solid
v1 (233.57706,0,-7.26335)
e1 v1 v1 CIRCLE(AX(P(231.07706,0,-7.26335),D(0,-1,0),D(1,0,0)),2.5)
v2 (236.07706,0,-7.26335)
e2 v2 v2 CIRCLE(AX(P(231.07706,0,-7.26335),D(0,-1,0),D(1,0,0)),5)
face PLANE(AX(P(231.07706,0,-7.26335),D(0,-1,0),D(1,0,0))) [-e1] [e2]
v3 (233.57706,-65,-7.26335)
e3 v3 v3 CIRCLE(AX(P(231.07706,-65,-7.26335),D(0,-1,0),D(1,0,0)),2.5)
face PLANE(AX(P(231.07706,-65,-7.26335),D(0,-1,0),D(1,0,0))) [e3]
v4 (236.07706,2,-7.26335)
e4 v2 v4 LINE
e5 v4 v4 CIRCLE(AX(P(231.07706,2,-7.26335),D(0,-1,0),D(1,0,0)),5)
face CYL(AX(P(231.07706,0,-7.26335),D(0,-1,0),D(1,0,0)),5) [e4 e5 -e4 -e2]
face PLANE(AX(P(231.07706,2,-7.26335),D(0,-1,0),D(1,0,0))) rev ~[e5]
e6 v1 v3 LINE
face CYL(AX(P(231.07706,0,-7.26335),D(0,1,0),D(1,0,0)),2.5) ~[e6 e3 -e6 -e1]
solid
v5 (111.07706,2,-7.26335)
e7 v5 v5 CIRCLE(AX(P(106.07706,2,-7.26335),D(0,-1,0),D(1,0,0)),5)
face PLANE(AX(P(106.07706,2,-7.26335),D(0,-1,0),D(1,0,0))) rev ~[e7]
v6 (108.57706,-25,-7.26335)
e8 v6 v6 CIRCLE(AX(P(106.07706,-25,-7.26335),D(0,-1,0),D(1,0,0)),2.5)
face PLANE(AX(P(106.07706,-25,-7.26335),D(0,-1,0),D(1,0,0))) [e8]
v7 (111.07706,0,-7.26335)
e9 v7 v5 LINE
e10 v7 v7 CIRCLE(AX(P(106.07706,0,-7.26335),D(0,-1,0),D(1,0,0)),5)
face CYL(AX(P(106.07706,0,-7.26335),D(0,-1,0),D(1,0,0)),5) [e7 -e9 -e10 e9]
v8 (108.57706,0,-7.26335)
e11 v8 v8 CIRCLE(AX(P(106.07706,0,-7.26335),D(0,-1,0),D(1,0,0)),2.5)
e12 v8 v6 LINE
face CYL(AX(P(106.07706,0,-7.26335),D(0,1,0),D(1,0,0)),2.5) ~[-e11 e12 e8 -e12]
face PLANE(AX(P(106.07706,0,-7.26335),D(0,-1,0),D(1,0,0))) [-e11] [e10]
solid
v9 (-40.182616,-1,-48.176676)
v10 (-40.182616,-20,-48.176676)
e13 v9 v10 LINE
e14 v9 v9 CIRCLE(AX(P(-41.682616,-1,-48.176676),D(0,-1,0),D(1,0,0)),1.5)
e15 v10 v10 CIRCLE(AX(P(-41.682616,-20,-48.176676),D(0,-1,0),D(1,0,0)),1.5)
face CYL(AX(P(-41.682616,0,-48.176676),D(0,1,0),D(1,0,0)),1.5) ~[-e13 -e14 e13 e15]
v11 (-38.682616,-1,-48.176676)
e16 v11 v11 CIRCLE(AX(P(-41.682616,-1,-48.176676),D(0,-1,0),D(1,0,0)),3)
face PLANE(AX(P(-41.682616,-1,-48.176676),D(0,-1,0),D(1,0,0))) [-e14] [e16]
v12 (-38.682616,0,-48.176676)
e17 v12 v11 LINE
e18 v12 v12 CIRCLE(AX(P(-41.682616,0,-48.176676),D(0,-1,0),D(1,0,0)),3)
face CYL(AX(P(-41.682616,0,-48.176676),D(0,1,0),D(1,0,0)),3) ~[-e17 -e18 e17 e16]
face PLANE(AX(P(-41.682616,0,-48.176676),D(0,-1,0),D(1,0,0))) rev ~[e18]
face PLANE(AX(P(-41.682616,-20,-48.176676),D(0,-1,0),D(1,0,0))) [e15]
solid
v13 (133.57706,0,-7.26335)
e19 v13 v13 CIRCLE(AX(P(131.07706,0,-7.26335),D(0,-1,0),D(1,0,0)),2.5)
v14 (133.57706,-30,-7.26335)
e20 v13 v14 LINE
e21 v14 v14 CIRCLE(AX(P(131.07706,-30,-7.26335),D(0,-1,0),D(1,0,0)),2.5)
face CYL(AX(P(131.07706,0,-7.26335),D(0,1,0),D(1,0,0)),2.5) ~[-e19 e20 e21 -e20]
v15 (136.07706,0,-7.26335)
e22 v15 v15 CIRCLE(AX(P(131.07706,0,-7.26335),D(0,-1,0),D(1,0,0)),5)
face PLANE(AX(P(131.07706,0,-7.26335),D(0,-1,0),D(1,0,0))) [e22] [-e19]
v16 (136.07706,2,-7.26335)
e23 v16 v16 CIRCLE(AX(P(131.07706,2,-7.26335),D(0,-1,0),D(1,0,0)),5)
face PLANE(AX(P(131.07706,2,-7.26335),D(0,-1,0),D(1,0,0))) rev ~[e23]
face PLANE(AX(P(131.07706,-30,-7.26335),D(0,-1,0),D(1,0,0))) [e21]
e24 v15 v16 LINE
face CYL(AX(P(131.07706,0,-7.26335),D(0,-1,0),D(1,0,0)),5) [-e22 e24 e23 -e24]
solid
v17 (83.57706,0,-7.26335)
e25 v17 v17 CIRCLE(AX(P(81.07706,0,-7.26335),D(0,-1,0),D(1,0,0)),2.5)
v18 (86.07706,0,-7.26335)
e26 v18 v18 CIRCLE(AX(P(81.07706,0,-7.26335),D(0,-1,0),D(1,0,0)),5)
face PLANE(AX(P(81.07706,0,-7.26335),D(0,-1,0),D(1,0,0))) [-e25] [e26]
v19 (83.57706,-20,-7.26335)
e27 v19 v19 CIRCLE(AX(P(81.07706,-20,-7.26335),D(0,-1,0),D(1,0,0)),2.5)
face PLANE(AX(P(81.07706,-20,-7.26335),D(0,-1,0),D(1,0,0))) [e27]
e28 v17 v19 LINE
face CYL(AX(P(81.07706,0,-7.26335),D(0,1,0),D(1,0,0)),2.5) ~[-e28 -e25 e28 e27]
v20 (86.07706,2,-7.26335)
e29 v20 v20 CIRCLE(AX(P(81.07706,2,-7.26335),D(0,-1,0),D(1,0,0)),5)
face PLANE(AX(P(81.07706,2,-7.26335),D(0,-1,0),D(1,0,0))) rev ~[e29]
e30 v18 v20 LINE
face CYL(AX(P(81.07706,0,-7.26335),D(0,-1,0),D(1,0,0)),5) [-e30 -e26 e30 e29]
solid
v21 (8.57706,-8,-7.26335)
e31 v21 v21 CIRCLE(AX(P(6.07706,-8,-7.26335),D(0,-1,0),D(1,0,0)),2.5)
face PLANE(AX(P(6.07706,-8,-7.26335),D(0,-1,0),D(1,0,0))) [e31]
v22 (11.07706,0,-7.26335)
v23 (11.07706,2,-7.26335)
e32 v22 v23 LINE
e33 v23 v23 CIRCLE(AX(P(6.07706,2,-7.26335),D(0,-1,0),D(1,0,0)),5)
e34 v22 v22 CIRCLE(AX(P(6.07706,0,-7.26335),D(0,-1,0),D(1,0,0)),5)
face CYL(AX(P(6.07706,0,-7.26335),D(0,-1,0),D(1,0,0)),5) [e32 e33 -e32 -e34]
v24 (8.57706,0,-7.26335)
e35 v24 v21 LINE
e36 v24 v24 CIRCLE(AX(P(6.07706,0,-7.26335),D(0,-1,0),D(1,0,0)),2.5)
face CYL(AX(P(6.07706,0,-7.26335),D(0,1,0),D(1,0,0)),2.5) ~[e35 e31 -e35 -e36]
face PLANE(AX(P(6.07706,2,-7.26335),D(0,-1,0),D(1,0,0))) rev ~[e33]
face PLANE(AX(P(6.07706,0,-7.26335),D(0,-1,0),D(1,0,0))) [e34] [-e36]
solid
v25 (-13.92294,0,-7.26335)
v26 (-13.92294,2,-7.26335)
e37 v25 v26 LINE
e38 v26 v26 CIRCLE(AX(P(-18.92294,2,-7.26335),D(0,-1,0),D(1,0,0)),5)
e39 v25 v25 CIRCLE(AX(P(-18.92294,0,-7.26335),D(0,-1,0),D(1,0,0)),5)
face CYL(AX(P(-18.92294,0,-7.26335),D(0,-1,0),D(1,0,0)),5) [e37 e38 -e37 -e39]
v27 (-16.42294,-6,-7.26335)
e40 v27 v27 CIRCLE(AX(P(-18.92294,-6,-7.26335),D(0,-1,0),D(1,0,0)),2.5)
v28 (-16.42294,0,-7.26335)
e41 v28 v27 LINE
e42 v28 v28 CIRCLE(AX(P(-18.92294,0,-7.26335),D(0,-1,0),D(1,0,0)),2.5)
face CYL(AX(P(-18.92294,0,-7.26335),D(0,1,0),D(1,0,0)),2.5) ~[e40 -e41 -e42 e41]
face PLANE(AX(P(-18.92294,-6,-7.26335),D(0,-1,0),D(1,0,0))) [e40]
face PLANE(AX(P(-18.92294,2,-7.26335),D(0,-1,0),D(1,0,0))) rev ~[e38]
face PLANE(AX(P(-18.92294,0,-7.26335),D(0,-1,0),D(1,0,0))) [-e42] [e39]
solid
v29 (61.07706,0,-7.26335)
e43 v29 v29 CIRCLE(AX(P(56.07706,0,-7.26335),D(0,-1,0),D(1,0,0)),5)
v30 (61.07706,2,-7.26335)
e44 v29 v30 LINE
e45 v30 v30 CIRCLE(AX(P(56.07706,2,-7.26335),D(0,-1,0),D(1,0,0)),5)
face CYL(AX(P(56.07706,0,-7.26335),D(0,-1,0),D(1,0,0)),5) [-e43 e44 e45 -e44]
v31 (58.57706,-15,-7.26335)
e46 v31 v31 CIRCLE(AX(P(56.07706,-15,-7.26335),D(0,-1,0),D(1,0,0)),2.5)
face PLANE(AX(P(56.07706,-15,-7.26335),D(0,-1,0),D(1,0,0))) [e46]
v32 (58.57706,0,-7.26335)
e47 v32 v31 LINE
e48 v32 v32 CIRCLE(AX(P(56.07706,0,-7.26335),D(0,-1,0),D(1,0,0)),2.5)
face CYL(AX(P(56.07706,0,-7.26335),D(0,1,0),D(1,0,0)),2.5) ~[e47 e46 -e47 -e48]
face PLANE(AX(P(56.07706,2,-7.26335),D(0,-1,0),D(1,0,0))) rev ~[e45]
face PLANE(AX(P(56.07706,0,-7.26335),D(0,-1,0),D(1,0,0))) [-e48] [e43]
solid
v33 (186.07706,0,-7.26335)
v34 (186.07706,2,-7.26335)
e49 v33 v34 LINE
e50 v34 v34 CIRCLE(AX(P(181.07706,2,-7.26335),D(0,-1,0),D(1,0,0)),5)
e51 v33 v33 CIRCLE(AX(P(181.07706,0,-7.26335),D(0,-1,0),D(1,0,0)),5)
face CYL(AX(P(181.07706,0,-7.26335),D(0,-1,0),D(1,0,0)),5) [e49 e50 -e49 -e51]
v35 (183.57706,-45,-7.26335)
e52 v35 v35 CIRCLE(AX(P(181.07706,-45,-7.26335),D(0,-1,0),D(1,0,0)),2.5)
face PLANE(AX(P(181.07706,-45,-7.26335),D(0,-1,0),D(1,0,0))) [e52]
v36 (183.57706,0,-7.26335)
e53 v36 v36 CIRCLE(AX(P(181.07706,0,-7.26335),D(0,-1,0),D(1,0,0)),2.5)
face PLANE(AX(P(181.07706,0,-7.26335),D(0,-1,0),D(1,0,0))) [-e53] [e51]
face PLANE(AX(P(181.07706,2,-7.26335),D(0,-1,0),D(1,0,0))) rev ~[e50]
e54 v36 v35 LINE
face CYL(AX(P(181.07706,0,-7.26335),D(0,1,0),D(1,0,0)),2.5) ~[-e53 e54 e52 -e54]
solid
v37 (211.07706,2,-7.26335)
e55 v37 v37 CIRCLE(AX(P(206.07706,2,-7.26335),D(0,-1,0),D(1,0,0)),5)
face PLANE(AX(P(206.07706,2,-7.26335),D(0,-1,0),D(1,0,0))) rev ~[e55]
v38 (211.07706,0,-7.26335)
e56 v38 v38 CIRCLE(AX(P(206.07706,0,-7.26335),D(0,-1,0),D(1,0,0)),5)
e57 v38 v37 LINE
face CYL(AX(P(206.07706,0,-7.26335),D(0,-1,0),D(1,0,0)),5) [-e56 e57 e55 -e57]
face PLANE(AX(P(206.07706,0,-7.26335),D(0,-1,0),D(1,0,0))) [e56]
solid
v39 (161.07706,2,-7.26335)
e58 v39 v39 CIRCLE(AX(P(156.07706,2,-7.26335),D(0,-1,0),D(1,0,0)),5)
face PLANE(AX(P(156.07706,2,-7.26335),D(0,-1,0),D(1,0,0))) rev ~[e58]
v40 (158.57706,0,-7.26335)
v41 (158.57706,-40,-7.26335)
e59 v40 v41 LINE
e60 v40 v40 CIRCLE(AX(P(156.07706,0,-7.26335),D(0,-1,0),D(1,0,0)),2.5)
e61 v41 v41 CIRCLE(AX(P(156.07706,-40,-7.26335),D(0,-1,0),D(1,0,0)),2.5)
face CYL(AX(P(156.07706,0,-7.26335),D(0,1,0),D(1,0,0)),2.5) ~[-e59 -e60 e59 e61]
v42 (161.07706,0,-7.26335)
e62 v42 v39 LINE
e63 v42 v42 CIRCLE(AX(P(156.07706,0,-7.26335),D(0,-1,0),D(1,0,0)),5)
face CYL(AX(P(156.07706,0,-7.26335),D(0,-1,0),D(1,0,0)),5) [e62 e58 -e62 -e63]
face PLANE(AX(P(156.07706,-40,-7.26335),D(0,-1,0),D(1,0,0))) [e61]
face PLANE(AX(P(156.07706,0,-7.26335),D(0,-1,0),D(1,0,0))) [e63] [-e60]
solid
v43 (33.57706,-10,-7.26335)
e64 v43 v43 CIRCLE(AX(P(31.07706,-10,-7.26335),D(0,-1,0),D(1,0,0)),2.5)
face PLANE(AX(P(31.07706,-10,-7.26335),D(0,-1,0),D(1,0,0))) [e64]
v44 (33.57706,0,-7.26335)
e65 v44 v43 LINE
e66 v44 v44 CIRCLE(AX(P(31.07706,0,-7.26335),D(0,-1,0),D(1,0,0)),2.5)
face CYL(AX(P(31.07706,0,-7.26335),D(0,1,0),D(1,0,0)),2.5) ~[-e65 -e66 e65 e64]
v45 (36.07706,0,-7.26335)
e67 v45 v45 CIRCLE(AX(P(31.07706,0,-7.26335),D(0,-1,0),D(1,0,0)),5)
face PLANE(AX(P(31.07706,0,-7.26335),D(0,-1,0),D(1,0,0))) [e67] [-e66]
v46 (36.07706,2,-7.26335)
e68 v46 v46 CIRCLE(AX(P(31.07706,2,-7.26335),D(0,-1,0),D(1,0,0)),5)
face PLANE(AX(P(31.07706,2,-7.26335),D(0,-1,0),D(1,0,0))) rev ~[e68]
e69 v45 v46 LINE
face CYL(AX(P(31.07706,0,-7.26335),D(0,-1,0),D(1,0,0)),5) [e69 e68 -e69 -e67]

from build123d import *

# Parameters (mm, degrees)
F0_R      = 5
F0_R_2    = 2.5
F1_DEPTH  = 2
F2_DEPTH  = 6
F3_DEPTH  = 8
F4_DEPTH  = 10
F5_DEPTH  = 15
F6_DEPTH  = 20
F7_DEPTH  = 25
F8_DEPTH  = 30
F9_DEPTH  = 40
F10_DEPTH = 45
F12_DEPTH = 65
F0_R_3    = 3
F0_R_4    = 1.5
F13_DEPTH = 1
F14_DEPTH = 20


# Not quite as in the source:
# - the program builds the solid bodies; features that only make, move or delete a surface that nothing else refers to are left out


with BuildPart() as f1:
    # F0 (on Front) → F1 (new body)
    with BuildSketch(Plane.XZ):
        with Locations((-18.9229398966, -7.2633498348)):
            Circle(F0_R)
        with Locations((-18.9229398966, -7.2633498348)):
            Circle(F0_R_2, mode=Mode.SUBTRACT)
        with Locations((-18.9229398966, -7.2633498348)):
            Circle(F0_R_2)
    extrude(amount=-F1_DEPTH)

    # F0 (on Front) → F2 (join)
    with BuildSketch(Plane.XZ):
        with Locations((-18.9229398966, -7.2633498348)):
            Circle(F0_R_2)
    extrude(amount=F2_DEPTH)


with BuildPart() as f1b:
    # F0 (on Front) → F1, piece 2 (new body)
    with BuildSketch(Plane.XZ):
        with Locations((6.0770601034, -7.2633498348)):
            Circle(F0_R)
        with Locations((6.0770601034, -7.2633498348)):
            Circle(F0_R_2, mode=Mode.SUBTRACT)
        with Locations((6.0770601034, -7.2633498348)):
            Circle(F0_R_2)
    extrude(amount=-F1_DEPTH)

    # F0 (on Front) → F3 (join)
    with BuildSketch(Plane.XZ):
        with Locations((6.0770601034, -7.2633498348)):
            Circle(F0_R_2)
    extrude(amount=F3_DEPTH)


with BuildPart() as f1c:
    # F0 (on Front) → F1, piece 3 (new body)
    with BuildSketch(Plane.XZ):
        with Locations((31.0770601034, -7.2633498348)):
            Circle(F0_R)
        with Locations((31.0770601034, -7.2633498348)):
            Circle(F0_R_2, mode=Mode.SUBTRACT)
        with Locations((31.0770601034, -7.2633498348)):
            Circle(F0_R_2)
    extrude(amount=-F1_DEPTH)

    # F0 (on Front) → F4 (join)
    with BuildSketch(Plane.XZ):
        with Locations((31.0770601034, -7.2633498348)):
            Circle(F0_R_2)
    extrude(amount=F4_DEPTH)


with BuildPart() as f1d:
    # F0 (on Front) → F1, piece 4 (new body)
    with BuildSketch(Plane.XZ):
        with Locations((56.0770601034, -7.2633498348)):
            Circle(F0_R)
        with Locations((56.0770601034, -7.2633498348)):
            Circle(F0_R_2, mode=Mode.SUBTRACT)
        with Locations((56.0770601034, -7.2633498348)):
            Circle(F0_R_2)
    extrude(amount=-F1_DEPTH)

    # F0 (on Front) → F5 (join)
    with BuildSketch(Plane.XZ):
        with Locations((56.0770601034, -7.2633498348)):
            Circle(F0_R_2)
    extrude(amount=F5_DEPTH)


with BuildPart() as f1e:
    # F0 (on Front) → F1, piece 5 (new body)
    with BuildSketch(Plane.XZ):
        with Locations((156.0770601034, -7.2633498348)):
            Circle(F0_R)
        with Locations((156.0770601034, -7.2633498348)):
            Circle(F0_R_2, mode=Mode.SUBTRACT)
        with Locations((156.0770601034, -7.2633498348)):
            Circle(F0_R_2)
    extrude(amount=-F1_DEPTH)

    # F0 (on Front) → F9 (join)
    with BuildSketch(Plane.XZ):
        with Locations((156.0770601034, -7.2633498348)):
            Circle(F0_R_2)
    extrude(amount=F9_DEPTH)


with BuildPart() as f1f:
    # F0 (on Front) → F1, piece 6 (new body)
    with BuildSketch(Plane.XZ):
        with Locations((131.0770601034, -7.2633498348)):
            Circle(F0_R)
        with Locations((131.0770601034, -7.2633498348)):
            Circle(F0_R_2, mode=Mode.SUBTRACT)
        with Locations((131.0770601034, -7.2633498348)):
            Circle(F0_R_2)
    extrude(amount=-F1_DEPTH)

    # F0 (on Front) → F8 (join)
    with BuildSketch(Plane.XZ):
        with Locations((131.0770601034, -7.2633498348)):
            Circle(F0_R_2)
    extrude(amount=F8_DEPTH)


with BuildPart() as f1g:
    # F0 (on Front) → F1, piece 7 (new body)
    with BuildSketch(Plane.XZ):
        with Locations((106.0770601034, -7.2633498348)):
            Circle(F0_R)
        with Locations((106.0770601034, -7.2633498348)):
            Circle(F0_R_2, mode=Mode.SUBTRACT)
        with Locations((106.0770601034, -7.2633498348)):
            Circle(F0_R_2)
    extrude(amount=-F1_DEPTH)

    # F0 (on Front) → F7 (join)
    with BuildSketch(Plane.XZ):
        with Locations((106.0770601034, -7.2633498348)):
            Circle(F0_R_2)
    extrude(amount=F7_DEPTH)


with BuildPart() as f1h:
    # F0 (on Front) → F1, piece 8 (new body)
    with BuildSketch(Plane.XZ):
        with Locations((81.0770601034, -7.2633498348)):
            Circle(F0_R)
        with Locations((81.0770601034, -7.2633498348)):
            Circle(F0_R_2, mode=Mode.SUBTRACT)
        with Locations((81.0770601034, -7.2633498348)):
            Circle(F0_R_2)
    extrude(amount=-F1_DEPTH)

    # F0 (on Front) → F6 (join)
    with BuildSketch(Plane.XZ):
        with Locations((81.0770601034, -7.2633498348)):
            Circle(F0_R_2)
    extrude(amount=F6_DEPTH)


with BuildPart() as f1i:
    # F0 (on Front) → F1, piece 9 (new body)
    with BuildSketch(Plane.XZ):
        with Locations((206.0770601034, -7.2633498348)):
            Circle(F0_R)
        with Locations((206.0770601034, -7.2633498348)):
            Circle(F0_R_2, mode=Mode.SUBTRACT)
        with Locations((206.0770601034, -7.2633498348)):
            Circle(F0_R_2)
    extrude(amount=-F1_DEPTH)


with BuildPart() as f1j:
    # F0 (on Front) → F1, piece 10 (new body)
    with BuildSketch(Plane.XZ):
        with Locations((181.0770601034, -7.2633498348)):
            Circle(F0_R)
        with Locations((181.0770601034, -7.2633498348)):
            Circle(F0_R_2, mode=Mode.SUBTRACT)
        with Locations((181.0770601034, -7.2633498348)):
            Circle(F0_R_2)
    extrude(amount=-F1_DEPTH)

    # F0 (on Front) → F10 (join)
    with BuildSketch(Plane.XZ):
        with Locations((181.0770601034, -7.2633498348)):
            Circle(F0_R_2)
    extrude(amount=F10_DEPTH)


with BuildPart() as f1k:
    # F0 (on Front) → F1, piece 11 (new body)
    with BuildSketch(Plane.XZ):
        with Locations((231.0770601034, -7.2633498348)):
            Circle(F0_R)
        with Locations((231.0770601034, -7.2633498348)):
            Circle(F0_R_2, mode=Mode.SUBTRACT)
        with Locations((231.0770601034, -7.2633498348)):
            Circle(F0_R_2)
    extrude(amount=-F1_DEPTH)

    # F0 (on Front) → F12 (join)
    with BuildSketch(Plane.XZ):
        with Locations((231.0770601034, -7.2633498348)):
            Circle(F0_R_2)
    extrude(amount=F12_DEPTH)


with BuildPart() as f13:
    # F0 (on Front) → F13 (new body)
    with BuildSketch(Plane.XZ):
        with Locations((-41.6826158762, -48.1766760349)):
            Circle(F0_R_3)
        with Locations((-41.6826158762, -48.1766760349)):
            Circle(F0_R_4, mode=Mode.SUBTRACT)
    extrude(amount=F13_DEPTH)

    # F0 (on Front) → F14 (join)
    with BuildSketch(Plane.XZ):
        with Locations((-41.6826158762, -48.1766760349)):
            Circle(F0_R_4)
    extrude(amount=F14_DEPTH)


solid = Compound([f1.part, f1b.part, f1c.part, f1d.part, f1e.part, f1f.part, f1g.part, f1h.part, f1i.part, f1j.part, f1k.part, f13.part])
